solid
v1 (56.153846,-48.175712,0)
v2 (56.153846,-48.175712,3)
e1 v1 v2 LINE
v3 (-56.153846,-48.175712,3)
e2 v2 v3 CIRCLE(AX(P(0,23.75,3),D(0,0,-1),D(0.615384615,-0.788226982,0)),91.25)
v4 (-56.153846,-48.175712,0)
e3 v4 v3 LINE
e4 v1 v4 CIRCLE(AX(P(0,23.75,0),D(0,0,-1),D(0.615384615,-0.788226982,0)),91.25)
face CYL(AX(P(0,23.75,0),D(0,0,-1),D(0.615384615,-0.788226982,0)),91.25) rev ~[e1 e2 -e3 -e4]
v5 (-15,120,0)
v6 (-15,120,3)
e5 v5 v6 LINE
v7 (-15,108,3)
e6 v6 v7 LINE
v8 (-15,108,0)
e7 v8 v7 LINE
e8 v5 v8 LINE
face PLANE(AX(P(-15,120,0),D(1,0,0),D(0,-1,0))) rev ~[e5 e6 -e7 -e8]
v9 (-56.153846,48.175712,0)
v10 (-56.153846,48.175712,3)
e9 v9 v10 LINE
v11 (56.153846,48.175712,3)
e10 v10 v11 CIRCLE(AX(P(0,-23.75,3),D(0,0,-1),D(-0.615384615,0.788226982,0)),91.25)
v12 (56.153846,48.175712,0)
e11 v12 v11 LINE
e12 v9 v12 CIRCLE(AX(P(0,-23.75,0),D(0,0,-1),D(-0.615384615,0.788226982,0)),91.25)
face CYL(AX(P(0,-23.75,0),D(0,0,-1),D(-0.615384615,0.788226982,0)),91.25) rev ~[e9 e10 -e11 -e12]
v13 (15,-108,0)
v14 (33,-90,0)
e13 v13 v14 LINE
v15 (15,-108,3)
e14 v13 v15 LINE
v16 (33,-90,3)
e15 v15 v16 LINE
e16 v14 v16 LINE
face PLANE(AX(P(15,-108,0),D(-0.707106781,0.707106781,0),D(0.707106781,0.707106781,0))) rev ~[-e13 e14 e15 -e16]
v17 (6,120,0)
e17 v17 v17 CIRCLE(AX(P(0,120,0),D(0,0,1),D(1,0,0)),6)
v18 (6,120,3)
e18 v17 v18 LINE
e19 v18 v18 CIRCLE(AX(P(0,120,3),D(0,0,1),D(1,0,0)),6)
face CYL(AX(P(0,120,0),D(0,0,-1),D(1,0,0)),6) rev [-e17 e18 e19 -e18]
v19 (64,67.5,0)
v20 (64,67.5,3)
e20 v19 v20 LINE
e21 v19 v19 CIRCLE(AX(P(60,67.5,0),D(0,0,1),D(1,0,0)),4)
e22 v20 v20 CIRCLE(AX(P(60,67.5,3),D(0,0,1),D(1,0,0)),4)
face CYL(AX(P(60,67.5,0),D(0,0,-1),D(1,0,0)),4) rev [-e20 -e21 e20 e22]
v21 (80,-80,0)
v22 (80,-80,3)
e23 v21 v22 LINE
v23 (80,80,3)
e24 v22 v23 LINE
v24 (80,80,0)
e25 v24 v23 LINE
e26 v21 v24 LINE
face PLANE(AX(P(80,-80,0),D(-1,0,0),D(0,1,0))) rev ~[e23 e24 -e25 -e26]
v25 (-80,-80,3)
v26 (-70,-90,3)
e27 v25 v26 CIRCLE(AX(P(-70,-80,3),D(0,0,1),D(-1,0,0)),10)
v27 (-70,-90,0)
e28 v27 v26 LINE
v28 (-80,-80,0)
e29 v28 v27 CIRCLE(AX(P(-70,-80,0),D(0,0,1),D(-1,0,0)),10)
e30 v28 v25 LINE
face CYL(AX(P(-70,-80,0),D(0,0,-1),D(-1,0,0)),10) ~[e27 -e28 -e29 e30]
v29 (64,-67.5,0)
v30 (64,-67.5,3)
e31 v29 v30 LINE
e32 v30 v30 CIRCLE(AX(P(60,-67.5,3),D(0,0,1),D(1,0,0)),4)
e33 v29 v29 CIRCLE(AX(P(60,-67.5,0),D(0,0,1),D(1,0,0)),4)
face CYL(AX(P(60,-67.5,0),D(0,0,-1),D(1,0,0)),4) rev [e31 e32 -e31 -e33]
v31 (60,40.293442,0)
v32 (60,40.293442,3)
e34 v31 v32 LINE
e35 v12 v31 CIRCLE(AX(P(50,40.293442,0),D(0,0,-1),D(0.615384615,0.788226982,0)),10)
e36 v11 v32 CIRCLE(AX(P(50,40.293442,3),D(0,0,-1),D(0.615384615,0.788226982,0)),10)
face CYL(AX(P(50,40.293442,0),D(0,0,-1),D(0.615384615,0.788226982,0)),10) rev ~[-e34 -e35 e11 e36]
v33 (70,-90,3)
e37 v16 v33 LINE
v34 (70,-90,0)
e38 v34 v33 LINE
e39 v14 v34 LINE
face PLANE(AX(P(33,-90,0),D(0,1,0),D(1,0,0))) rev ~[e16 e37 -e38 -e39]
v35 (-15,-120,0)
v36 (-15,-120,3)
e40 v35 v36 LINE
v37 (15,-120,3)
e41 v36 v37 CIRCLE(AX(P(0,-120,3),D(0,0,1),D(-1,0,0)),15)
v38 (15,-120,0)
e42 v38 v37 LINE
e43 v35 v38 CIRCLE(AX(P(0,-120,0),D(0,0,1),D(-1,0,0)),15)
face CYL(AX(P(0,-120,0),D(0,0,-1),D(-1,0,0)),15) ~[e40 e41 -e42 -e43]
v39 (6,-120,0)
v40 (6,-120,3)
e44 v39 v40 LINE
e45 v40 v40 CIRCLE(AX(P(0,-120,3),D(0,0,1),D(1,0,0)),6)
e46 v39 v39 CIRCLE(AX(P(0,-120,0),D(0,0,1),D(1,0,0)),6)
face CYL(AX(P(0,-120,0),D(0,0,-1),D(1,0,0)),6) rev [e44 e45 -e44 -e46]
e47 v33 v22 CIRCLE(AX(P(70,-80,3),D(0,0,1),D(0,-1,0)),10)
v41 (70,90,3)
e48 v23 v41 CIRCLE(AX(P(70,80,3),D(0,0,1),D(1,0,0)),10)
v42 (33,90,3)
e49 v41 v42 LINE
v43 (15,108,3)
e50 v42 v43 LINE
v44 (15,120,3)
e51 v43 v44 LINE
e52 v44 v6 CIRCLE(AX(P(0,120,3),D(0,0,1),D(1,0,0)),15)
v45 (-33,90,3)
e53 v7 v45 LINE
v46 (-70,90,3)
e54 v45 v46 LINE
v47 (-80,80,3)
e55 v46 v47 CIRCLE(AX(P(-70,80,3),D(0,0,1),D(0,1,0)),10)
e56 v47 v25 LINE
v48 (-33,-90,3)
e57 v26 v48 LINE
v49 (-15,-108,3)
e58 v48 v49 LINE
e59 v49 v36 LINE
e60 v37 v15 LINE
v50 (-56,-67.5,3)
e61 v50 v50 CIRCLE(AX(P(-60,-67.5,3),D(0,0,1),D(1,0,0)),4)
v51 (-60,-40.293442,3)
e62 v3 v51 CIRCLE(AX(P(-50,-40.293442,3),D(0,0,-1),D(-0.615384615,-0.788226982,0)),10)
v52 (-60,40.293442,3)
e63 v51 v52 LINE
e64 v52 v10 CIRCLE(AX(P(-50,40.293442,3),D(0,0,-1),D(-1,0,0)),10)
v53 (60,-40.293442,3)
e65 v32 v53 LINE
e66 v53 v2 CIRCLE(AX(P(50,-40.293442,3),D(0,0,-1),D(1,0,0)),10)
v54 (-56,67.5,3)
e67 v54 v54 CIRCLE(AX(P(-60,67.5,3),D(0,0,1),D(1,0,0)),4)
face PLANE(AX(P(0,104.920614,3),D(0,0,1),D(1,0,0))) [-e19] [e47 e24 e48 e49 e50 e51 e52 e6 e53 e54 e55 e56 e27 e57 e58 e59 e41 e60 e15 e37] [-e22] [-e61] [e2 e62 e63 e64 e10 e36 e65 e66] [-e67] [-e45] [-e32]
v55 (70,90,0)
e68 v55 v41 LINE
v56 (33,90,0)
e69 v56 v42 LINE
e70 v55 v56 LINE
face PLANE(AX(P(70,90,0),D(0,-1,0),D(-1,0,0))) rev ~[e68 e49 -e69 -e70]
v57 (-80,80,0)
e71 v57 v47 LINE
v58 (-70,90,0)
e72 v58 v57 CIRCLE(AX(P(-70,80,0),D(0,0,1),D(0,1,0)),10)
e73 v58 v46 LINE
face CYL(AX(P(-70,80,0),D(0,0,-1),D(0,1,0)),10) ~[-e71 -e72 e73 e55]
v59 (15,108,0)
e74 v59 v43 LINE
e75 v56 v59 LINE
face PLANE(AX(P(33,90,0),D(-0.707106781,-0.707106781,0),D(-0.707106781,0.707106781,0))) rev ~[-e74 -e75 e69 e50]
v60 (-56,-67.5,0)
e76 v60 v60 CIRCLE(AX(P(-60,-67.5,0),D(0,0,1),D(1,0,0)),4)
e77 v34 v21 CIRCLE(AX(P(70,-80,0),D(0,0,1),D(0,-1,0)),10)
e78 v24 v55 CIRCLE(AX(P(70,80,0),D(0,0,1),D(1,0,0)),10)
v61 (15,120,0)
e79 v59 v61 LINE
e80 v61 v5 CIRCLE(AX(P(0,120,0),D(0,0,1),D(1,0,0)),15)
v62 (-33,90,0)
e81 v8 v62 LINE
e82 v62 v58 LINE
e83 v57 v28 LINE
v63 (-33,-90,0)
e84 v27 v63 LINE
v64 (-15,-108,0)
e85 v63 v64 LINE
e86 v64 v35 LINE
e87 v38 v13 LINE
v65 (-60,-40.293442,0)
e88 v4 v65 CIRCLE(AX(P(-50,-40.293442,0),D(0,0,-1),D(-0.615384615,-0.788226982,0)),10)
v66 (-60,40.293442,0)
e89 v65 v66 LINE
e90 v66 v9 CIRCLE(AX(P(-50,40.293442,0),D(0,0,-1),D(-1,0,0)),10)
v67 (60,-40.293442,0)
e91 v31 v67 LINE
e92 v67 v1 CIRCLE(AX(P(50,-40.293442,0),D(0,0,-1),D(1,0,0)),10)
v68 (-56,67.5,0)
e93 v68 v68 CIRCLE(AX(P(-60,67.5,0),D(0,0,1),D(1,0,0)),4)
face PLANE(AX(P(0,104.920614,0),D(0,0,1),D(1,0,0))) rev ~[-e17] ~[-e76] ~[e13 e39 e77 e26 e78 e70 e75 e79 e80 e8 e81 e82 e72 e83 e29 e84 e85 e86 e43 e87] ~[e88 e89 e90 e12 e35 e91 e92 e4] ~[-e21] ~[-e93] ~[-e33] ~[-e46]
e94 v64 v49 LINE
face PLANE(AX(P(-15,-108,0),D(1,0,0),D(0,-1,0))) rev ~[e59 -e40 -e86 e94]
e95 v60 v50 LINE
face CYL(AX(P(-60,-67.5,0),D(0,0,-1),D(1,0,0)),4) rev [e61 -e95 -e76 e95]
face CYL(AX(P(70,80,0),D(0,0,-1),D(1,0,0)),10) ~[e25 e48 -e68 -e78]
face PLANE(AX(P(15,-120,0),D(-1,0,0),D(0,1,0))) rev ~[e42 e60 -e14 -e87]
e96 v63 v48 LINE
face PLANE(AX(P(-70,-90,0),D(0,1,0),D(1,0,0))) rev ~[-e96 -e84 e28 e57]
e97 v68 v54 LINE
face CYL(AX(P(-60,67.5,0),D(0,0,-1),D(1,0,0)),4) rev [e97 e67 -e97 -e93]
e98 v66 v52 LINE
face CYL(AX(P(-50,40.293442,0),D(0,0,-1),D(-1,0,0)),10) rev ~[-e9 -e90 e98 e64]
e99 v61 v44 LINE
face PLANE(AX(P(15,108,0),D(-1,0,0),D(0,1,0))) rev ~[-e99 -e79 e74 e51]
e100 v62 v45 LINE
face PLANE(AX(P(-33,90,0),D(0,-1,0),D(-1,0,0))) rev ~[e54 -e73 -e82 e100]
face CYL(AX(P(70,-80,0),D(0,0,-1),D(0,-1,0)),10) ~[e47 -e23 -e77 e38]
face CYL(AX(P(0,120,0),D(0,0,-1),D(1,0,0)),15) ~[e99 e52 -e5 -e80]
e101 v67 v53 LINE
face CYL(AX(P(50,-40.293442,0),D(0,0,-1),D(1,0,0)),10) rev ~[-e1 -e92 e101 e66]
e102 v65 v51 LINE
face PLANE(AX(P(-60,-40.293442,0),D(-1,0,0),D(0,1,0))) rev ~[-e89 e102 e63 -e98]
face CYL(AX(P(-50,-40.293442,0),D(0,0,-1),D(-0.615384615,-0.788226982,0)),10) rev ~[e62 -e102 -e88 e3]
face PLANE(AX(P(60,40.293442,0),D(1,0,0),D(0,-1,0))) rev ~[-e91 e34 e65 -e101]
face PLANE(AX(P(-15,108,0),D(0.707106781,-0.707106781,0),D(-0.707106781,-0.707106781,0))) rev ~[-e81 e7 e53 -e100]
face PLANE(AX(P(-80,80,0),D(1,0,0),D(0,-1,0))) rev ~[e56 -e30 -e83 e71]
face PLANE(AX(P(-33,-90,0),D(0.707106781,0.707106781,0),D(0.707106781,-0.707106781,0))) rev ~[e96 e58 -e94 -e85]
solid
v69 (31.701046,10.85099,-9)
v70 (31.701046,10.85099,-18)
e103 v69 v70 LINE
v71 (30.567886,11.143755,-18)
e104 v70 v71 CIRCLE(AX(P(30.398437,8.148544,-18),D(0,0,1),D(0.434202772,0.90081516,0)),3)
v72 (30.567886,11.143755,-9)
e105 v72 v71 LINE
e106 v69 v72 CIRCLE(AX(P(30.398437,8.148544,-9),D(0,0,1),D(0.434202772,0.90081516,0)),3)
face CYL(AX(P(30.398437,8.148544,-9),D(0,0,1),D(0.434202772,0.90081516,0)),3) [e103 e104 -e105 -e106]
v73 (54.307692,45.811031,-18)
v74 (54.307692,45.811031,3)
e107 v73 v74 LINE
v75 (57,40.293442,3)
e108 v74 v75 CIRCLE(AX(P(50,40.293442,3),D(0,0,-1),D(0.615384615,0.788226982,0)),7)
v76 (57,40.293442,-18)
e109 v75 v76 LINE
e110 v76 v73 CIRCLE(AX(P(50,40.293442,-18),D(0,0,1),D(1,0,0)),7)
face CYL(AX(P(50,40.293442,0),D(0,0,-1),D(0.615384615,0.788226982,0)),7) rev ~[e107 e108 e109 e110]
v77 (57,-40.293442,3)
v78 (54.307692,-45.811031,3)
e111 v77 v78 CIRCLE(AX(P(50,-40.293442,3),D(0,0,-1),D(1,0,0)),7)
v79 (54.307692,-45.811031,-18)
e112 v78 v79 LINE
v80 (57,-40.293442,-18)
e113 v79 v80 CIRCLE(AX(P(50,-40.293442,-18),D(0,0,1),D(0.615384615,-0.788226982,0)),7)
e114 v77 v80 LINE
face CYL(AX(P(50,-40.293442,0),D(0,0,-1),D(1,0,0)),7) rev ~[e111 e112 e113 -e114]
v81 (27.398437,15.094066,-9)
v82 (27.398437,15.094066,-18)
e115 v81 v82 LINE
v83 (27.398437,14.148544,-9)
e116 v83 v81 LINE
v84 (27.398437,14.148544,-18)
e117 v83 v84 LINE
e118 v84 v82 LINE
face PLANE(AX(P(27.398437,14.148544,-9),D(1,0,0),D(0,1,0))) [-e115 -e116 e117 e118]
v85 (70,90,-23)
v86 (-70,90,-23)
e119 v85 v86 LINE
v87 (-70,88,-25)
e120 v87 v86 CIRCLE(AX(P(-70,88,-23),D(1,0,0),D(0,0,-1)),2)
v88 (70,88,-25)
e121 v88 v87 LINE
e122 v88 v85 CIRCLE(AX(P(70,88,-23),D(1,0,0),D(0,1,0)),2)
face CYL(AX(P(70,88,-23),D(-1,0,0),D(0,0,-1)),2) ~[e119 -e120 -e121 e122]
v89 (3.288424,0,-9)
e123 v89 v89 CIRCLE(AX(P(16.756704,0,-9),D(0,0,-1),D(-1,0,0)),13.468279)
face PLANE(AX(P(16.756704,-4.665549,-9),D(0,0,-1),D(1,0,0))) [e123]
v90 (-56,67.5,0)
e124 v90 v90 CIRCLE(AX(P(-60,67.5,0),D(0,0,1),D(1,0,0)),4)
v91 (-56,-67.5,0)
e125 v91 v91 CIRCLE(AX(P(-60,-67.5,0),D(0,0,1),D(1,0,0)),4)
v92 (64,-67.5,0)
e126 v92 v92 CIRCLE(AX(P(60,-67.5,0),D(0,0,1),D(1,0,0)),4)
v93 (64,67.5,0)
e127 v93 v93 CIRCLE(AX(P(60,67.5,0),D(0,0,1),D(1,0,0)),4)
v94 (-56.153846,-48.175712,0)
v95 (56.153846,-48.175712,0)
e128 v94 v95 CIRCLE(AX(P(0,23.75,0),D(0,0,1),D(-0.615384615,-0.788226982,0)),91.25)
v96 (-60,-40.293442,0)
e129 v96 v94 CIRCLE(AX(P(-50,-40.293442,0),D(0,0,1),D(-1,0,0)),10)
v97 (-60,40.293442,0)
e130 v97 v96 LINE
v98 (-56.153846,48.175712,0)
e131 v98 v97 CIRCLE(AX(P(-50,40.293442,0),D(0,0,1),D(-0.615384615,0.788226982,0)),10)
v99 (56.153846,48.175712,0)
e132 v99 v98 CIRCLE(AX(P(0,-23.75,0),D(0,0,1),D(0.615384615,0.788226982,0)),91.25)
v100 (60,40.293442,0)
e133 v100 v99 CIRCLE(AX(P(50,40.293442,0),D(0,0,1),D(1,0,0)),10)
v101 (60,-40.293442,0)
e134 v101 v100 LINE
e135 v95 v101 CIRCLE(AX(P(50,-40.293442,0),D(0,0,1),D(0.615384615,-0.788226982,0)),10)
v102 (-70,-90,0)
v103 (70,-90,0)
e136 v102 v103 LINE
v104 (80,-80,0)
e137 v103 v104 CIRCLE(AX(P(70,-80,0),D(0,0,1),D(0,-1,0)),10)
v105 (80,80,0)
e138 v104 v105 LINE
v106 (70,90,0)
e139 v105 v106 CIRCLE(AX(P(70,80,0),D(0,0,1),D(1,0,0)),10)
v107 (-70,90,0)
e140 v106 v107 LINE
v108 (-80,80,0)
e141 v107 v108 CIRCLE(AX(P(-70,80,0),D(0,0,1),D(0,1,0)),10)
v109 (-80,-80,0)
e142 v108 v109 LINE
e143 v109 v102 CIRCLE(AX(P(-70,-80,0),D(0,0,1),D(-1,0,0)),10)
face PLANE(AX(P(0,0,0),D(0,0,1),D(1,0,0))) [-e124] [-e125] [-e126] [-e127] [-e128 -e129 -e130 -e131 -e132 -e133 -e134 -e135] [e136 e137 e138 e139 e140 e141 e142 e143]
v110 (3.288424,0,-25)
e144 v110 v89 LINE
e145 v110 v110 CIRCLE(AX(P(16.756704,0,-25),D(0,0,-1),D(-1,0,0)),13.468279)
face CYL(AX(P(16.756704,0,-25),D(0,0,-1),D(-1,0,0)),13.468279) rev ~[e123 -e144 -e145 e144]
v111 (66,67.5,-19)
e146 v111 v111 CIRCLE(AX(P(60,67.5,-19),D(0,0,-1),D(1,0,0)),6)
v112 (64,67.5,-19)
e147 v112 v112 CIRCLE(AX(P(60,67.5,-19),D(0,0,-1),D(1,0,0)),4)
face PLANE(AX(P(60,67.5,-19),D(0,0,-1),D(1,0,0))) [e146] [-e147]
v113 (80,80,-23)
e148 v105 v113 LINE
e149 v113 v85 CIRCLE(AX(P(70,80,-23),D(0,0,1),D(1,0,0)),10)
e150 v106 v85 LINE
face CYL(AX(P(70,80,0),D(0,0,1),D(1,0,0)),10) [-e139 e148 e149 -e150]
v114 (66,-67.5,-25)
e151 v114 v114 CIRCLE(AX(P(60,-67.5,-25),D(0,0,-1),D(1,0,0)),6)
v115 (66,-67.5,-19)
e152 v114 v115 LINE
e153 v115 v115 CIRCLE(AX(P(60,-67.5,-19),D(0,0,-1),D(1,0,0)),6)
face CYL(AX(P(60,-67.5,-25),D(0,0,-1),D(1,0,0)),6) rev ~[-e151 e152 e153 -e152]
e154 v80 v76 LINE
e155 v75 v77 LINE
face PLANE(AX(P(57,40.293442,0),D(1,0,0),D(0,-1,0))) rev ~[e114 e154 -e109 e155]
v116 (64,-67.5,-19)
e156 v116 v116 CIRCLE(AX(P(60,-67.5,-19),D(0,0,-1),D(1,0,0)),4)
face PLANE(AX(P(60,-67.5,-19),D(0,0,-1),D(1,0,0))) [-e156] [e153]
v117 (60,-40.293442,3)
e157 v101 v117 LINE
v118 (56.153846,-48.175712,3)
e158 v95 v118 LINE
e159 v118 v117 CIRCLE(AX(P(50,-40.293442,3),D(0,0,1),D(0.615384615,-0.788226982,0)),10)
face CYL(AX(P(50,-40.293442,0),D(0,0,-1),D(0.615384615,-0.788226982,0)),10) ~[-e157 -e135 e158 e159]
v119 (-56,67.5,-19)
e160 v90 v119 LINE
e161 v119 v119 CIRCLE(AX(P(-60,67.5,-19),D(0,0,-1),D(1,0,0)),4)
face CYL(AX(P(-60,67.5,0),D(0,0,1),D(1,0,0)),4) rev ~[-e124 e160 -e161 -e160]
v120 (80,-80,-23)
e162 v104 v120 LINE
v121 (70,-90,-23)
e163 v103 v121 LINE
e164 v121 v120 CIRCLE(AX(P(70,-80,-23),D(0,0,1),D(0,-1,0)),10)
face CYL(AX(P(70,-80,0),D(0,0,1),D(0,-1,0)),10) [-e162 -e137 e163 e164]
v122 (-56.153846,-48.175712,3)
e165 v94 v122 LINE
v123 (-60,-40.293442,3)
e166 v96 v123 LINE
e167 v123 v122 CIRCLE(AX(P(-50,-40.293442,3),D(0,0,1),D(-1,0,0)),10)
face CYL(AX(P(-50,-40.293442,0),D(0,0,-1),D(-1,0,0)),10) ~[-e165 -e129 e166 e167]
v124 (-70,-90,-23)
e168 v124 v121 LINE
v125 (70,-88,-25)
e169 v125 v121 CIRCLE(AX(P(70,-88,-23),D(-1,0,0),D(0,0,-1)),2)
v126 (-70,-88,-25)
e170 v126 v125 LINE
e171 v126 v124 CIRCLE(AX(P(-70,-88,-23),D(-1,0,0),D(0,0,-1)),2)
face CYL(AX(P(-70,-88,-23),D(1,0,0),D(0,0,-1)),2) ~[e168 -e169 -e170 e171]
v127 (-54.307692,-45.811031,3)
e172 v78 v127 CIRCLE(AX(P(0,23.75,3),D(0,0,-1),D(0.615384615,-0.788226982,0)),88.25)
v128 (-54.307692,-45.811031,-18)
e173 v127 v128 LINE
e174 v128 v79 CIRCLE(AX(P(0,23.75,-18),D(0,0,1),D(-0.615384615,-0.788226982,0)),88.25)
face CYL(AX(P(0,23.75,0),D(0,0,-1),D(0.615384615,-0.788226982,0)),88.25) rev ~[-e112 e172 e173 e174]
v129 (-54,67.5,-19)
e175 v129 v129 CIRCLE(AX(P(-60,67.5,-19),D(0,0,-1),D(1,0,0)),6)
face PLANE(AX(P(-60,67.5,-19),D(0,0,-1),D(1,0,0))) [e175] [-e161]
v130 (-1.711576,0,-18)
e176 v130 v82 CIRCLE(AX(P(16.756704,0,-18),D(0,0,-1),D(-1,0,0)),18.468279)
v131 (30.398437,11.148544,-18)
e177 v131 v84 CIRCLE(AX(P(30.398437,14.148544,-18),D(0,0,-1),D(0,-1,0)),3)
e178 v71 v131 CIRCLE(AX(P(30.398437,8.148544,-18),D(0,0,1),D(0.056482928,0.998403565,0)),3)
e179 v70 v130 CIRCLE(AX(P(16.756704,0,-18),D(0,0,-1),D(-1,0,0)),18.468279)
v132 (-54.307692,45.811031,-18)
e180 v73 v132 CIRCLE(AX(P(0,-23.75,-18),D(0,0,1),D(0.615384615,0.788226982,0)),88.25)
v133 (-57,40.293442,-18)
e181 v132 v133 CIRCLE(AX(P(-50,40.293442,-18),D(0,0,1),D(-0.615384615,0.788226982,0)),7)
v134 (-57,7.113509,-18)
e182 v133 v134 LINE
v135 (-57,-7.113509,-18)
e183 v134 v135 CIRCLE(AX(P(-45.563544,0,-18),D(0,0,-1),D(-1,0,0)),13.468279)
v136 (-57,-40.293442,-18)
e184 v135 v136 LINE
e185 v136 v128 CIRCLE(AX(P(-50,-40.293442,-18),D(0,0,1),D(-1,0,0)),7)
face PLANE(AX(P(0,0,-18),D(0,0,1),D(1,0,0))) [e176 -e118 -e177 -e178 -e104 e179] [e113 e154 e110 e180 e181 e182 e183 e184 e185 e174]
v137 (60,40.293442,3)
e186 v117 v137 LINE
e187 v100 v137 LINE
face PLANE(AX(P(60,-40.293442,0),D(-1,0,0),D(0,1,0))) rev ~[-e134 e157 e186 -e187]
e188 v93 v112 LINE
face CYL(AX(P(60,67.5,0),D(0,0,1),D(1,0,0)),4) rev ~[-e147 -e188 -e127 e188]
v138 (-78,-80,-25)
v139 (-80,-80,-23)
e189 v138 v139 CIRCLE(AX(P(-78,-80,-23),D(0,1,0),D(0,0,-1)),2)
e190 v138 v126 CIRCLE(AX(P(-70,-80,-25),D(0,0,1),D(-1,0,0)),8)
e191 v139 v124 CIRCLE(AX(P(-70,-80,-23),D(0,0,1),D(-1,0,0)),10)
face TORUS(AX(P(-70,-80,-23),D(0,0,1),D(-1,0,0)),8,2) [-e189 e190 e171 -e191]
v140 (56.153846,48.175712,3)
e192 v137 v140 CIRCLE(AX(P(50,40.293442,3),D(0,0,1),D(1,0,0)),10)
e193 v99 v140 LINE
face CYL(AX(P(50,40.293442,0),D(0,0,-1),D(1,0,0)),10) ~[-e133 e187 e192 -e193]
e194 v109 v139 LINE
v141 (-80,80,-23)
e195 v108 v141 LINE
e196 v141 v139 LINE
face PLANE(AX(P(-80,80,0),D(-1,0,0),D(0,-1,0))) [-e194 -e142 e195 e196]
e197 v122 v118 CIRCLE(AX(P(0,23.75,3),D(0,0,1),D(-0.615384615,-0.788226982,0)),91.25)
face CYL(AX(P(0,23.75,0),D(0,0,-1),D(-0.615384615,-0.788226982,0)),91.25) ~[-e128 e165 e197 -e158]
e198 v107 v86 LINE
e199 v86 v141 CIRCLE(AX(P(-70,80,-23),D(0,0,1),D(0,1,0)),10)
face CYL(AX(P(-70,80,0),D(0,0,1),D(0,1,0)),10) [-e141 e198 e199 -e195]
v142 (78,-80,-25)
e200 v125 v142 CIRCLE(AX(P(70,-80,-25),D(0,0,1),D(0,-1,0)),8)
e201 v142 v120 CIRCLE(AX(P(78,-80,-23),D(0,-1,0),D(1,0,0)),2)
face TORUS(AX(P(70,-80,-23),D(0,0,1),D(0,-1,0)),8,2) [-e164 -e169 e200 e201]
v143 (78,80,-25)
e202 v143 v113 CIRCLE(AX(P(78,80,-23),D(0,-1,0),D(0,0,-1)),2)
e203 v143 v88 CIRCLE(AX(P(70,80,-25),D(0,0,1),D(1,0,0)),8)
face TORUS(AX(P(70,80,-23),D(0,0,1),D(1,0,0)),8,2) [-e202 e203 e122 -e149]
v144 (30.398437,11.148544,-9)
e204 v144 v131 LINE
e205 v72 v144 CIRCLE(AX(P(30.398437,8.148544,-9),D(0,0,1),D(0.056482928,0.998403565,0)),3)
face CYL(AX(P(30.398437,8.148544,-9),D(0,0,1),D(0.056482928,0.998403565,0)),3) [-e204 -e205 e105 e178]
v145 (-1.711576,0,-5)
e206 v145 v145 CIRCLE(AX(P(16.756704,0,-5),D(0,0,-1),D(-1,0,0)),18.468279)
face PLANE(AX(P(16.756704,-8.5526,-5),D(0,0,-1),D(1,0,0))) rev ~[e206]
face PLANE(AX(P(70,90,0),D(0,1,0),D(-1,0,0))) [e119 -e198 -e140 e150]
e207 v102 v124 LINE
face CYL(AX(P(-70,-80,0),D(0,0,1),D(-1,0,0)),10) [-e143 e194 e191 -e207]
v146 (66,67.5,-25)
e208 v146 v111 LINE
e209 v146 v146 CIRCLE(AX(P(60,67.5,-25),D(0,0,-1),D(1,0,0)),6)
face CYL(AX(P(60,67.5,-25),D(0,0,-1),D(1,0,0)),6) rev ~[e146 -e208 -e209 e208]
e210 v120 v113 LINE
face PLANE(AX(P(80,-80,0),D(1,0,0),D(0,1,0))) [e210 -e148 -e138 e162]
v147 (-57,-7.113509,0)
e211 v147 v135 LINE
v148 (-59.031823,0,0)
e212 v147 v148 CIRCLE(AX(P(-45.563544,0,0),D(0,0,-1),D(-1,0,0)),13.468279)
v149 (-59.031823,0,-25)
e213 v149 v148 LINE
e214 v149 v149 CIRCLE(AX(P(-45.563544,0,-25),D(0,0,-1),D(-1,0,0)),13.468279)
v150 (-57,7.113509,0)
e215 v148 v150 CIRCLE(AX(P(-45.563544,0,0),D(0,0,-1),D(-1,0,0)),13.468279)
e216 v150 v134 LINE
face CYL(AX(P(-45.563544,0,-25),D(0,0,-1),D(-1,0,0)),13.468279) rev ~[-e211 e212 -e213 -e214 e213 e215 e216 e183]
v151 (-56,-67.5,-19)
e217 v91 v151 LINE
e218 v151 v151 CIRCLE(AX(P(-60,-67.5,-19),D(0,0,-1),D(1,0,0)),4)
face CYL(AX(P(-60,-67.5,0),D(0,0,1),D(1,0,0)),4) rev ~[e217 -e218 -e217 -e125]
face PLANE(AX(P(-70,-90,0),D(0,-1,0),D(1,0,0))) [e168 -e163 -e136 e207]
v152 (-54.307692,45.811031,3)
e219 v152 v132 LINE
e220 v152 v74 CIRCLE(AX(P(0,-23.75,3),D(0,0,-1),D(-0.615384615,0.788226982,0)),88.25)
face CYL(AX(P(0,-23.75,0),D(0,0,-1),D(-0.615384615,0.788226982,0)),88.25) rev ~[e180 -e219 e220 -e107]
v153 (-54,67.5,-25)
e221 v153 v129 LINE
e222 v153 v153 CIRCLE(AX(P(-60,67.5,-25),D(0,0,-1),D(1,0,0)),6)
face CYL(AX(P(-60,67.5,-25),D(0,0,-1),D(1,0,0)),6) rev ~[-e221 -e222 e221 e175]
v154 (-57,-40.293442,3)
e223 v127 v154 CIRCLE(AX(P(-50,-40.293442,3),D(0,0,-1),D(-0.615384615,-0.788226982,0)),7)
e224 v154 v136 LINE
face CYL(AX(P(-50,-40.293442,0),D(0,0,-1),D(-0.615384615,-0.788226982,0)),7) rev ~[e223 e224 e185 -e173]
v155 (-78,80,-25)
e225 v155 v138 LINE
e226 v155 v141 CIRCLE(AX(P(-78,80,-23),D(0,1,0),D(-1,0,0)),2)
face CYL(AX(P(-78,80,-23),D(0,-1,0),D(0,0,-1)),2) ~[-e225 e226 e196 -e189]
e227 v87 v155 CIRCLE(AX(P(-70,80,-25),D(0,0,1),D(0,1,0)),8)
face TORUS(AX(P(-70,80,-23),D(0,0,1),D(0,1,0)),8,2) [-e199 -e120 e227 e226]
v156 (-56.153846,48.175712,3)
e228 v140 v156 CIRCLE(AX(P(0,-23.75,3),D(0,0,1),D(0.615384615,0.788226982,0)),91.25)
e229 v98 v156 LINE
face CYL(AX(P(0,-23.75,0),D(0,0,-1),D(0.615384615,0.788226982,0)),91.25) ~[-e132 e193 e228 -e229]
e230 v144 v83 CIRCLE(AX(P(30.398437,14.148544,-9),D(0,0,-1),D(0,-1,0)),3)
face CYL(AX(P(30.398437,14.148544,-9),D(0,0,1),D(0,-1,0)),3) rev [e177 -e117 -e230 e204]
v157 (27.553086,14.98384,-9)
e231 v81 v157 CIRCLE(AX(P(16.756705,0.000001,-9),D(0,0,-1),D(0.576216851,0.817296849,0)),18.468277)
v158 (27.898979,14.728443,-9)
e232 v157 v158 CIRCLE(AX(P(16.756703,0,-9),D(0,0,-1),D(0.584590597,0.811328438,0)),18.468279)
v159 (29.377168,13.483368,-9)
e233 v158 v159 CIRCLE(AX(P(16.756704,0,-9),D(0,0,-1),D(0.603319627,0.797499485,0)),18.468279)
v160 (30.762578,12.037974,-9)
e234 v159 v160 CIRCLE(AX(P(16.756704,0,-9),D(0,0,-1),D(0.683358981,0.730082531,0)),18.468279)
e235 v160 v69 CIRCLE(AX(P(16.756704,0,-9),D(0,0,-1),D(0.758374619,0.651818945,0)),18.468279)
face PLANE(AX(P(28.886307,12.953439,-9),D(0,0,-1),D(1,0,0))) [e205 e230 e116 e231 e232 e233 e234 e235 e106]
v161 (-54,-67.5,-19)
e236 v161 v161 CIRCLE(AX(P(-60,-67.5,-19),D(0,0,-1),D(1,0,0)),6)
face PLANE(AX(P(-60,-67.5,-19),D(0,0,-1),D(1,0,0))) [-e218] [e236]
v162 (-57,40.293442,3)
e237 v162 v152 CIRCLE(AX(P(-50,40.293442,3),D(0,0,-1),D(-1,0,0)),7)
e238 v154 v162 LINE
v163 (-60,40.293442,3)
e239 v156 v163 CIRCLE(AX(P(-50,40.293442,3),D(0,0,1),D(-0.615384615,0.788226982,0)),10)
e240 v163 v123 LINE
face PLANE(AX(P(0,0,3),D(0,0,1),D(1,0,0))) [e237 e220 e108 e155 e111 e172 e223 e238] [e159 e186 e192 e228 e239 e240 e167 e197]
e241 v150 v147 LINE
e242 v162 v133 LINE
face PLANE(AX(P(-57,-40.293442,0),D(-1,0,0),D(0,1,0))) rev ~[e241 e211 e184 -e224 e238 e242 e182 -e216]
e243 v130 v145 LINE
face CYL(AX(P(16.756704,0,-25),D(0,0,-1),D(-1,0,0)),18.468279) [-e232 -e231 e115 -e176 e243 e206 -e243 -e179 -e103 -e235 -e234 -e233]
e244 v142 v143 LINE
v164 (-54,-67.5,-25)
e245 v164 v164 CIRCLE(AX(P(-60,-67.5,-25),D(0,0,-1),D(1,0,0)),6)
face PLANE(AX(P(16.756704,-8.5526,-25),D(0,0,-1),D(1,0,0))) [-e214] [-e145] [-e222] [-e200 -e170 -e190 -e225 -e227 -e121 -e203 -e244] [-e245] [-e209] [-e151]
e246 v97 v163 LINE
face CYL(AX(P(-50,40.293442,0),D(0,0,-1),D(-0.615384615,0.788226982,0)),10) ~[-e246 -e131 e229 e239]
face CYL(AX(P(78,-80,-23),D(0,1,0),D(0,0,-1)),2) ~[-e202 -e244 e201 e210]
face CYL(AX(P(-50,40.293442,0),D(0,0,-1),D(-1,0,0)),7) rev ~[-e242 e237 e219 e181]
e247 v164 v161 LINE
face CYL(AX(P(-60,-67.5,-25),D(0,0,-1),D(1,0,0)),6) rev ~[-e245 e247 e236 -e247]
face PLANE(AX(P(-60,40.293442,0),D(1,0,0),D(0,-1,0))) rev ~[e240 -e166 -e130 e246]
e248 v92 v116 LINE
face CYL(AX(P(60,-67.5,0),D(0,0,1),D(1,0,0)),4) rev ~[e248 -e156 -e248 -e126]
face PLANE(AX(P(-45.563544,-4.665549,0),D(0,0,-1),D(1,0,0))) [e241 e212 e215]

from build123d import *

# Parameters (mm, degrees)
F0_R      = 4
F1_DEPTH  = 25
F2_DEPTH  = 3
F3_DEPTH  = 18
F5_DEPTH  = 2
F7_DEPTH  = 20
F8_DEPTH  = 16
F9_DEPTH  = 25
F6_R      = 6
F6_R_2    = 4
F10_DEPTH = 6
F12_DEPTH = 9
F14_R     = 2
F15_R     = 6
F15_R_2   = 4
F16_DEPTH = 3


# Not quite as in the source:
# - a feature of the source that left no trace in its solid (it failed there, or was rolled back) is left out


with BuildPart() as f1:
    # F0 (on Top) → F1 (new body)
    with BuildSketch(Plane.XY):
        with BuildLine():
            ThreePointArc((-80, -80), (-77.0710678119, -87.0710678119), (-70, -90))
            Line((-70, -90), (70, -90))
            ThreePointArc((70, -90), (77.0710678119, -87.0710678119), (80, -80))
            Line((80, -80), (80, 80))
            ThreePointArc((80, 80), (77.0710678119, 87.0710678119), (70, 90))
            Line((70, 90), (-70, 90))
            ThreePointArc((-70, 90), (-77.0710678119, 87.0710678119), (-80, 80))
            Line((-80, 80), (-80, -80))
        make_face()
        with Locations((-60, -67.5)):
            Circle(F0_R, mode=Mode.SUBTRACT)
        with Locations((60, -67.5)):
            Circle(F0_R, mode=Mode.SUBTRACT)
        with Locations((-60, 67.5)):
            Circle(F0_R, mode=Mode.SUBTRACT)
        with BuildLine():
            ThreePointArc((-64, 40.2934422872), (-62.5820384798, 46.4328484224), (-58.6153846154, 51.3286200352))
            ThreePointArc((-58.6153846154, 51.3286200352), (0, 71.5), (58.6153846154, 51.3286200352))
            ThreePointArc((58.6153846154, 51.3286200352), (62.5820384798, 46.4328484224), (64, 40.2934422872))
            Line((64, 40.2934422872), (64, -40.2934422872))
            ThreePointArc((64, -40.2934422872), (62.5820384798, -46.4328484224), (58.6153846154, -51.3286200352))
            ThreePointArc((58.6153846154, -51.3286200352), (0, -71.5), (-58.6153846154, -51.3286200352))
            ThreePointArc((-58.6153846154, -51.3286200352), (-62.5820384798, -46.4328484224), (-64, -40.2934422872))
            Line((-64, -40.2934422872), (-64, 40.2934422872))
        make_face(mode=Mode.SUBTRACT)
        with Locations((60, 67.5)):
            Circle(F0_R, mode=Mode.SUBTRACT)
        with BuildLine():
            ThreePointArc((58.6153846154, 51.3286200352), (0, 71.5), (-58.6153846154, 51.3286200352))
            ThreePointArc((-58.6153846154, 51.3286200352), (-62.5820384798, 46.4328484224), (-64, 40.2934422872))
            Line((-64, 40.2934422872), (-64, -40.2934422872))
            ThreePointArc((-64, -40.2934422872), (-62.5820384798, -46.4328484224), (-58.6153846154, -51.3286200352))
            ThreePointArc((-58.6153846154, -51.3286200352), (0, -71.5), (58.6153846154, -51.3286200352))
            ThreePointArc((58.6153846154, -51.3286200352), (62.5820384798, -46.4328484224), (64, -40.2934422872))
            Line((64, -40.2934422872), (64, 40.2934422872))
            ThreePointArc((64, 40.2934422872), (62.5820384798, 46.4328484224), (58.6153846154, 51.3286200352))
        make_face()
        with BuildLine():
            Line((-60, -40.2934422872), (-60, 40.2934422872))
            ThreePointArc((-60, 40.2934422872), (-58.9871703427, 44.6787323838), (-56.1538461538, 48.1757121072))
            ThreePointArc((-56.1538461538, 48.1757121072), (0, 67.5), (56.1538461538, 48.1757121072))
            ThreePointArc((56.1538461538, 48.1757121072), (58.9871703427, 44.6787323838), (60, 40.2934422872))
            Line((60, 40.2934422872), (60, -40.2934422872))
            ThreePointArc((60, -40.2934422872), (58.9871703427, -44.6787323838), (56.1538461538, -48.1757121072))
            ThreePointArc((56.1538461538, -48.1757121072), (0, -67.5), (-56.1538461538, -48.1757121072))
            ThreePointArc((-56.1538461538, -48.1757121072), (-58.9871703427, -44.6787323838), (-60, -40.2934422872))
        make_face(mode=Mode.SUBTRACT)
        with BuildLine():
            ThreePointArc((-56.1538461538, 48.1757121072), (-58.9871703427, 44.6787323838), (-60, 40.2934422872))
            Line((-60, 40.2934422872), (-60, -40.2934422872))
            ThreePointArc((-60, -40.2934422872), (-58.9871703427, -44.6787323838), (-56.1538461538, -48.1757121072))
            ThreePointArc((-56.1538461538, -48.1757121072), (0, -67.5), (56.1538461538, -48.1757121072))
            ThreePointArc((56.1538461538, -48.1757121072), (58.9871703427, -44.6787323838), (60, -40.2934422872))
            Line((60, -40.2934422872), (60, 40.2934422872))
            ThreePointArc((60, 40.2934422872), (58.9871703427, 44.6787323838), (56.1538461538, 48.1757121072))
            ThreePointArc((56.1538461538, 48.1757121072), (0, 67.5), (-56.1538461538, 48.1757121072))
        make_face()
        with BuildLine():
            ThreePointArc((54.3076923077, 45.8110311612), (56.2910192399, 43.3631453548), (57, 40.2934422872))
            Line((57, 40.2934422872), (57, -40.2934422872))
            ThreePointArc((57, -40.2934422872), (56.2910192399, -43.3631453548), (54.3076923077, -45.8110311612))
            ThreePointArc((54.3076923077, -45.8110311612), (0, -64.5), (-54.3076923077, -45.8110311612))
            ThreePointArc((-54.3076923077, -45.8110311612), (-56.2910192399, -43.3631453548), (-57, -40.2934422872))
            Line((-57, -40.2934422872), (-57, 40.2934422872))
            ThreePointArc((-57, 40.2934422872), (-56.2910192399, 43.3631453548), (-54.3076923077, 45.8110311612))
            ThreePointArc((-54.3076923077, 45.8110311612), (0, 64.5), (54.3076923077, 45.8110311612))
        make_face(mode=Mode.SUBTRACT)
        with BuildLine():
            Line((57, -40.2934422872), (57, 40.2934422872))
            ThreePointArc((57, 40.2934422872), (56.2910192399, 43.3631453548), (54.3076923077, 45.8110311612))
            ThreePointArc((54.3076923077, 45.8110311612), (0, 64.5), (-54.3076923077, 45.8110311612))
            ThreePointArc((-54.3076923077, 45.8110311612), (-56.2910192399, 43.3631453548), (-57, 40.2934422872))
            Line((-57, 40.2934422872), (-57, -40.2934422872))
            ThreePointArc((-57, -40.2934422872), (-56.2910192399, -43.3631453548), (-54.3076923077, -45.8110311612))
            ThreePointArc((-54.3076923077, -45.8110311612), (0, -64.5), (54.3076923077, -45.8110311612))
            ThreePointArc((54.3076923077, -45.8110311612), (56.2910192399, -43.3631453548), (57, -40.2934422872))
        make_face()
    extrude(amount=-F1_DEPTH)

    # F0 (on Top) → F2 (join)
    with BuildSketch(Plane.XY):
        with BuildLine():
            ThreePointArc((-56.1538461538, 48.1757121072), (-58.9871703427, 44.6787323838), (-60, 40.2934422872))
            Line((-60, 40.2934422872), (-60, -40.2934422872))
            ThreePointArc((-60, -40.2934422872), (-58.9871703427, -44.6787323838), (-56.1538461538, -48.1757121072))
            ThreePointArc((-56.1538461538, -48.1757121072), (0, -67.5), (56.1538461538, -48.1757121072))
            ThreePointArc((56.1538461538, -48.1757121072), (58.9871703427, -44.6787323838), (60, -40.2934422872))
            Line((60, -40.2934422872), (60, 40.2934422872))
            ThreePointArc((60, 40.2934422872), (58.9871703427, 44.6787323838), (56.1538461538, 48.1757121072))
            ThreePointArc((56.1538461538, 48.1757121072), (0, 67.5), (-56.1538461538, 48.1757121072))
        make_face()
        with BuildLine():
            ThreePointArc((54.3076923077, 45.8110311612), (56.2910192399, 43.3631453548), (57, 40.2934422872))
            Line((57, 40.2934422872), (57, -40.2934422872))
            ThreePointArc((57, -40.2934422872), (56.2910192399, -43.3631453548), (54.3076923077, -45.8110311612))
            ThreePointArc((54.3076923077, -45.8110311612), (0, -64.5), (-54.3076923077, -45.8110311612))
            ThreePointArc((-54.3076923077, -45.8110311612), (-56.2910192399, -43.3631453548), (-57, -40.2934422872))
            Line((-57, -40.2934422872), (-57, 40.2934422872))
            ThreePointArc((-57, 40.2934422872), (-56.2910192399, 43.3631453548), (-54.3076923077, 45.8110311612))
            ThreePointArc((-54.3076923077, 45.8110311612), (0, 64.5), (54.3076923077, 45.8110311612))
        make_face(mode=Mode.SUBTRACT)
    extrude(amount=F2_DEPTH)

    # F0 (on Top) → F3 (cut)
    with BuildSketch(Plane.XY):
        with BuildLine():
            Line((57, -40.2934422872), (57, 40.2934422872))
            ThreePointArc((57, 40.2934422872), (56.2910192399, 43.3631453548), (54.3076923077, 45.8110311612))
            ThreePointArc((54.3076923077, 45.8110311612), (0, 64.5), (-54.3076923077, 45.8110311612))
            ThreePointArc((-54.3076923077, 45.8110311612), (-56.2910192399, 43.3631453548), (-57, 40.2934422872))
            Line((-57, 40.2934422872), (-57, -40.2934422872))
            ThreePointArc((-57, -40.2934422872), (-56.2910192399, -43.3631453548), (-54.3076923077, -45.8110311612))
            ThreePointArc((-54.3076923077, -45.8110311612), (0, -64.5), (54.3076923077, -45.8110311612))
            ThreePointArc((54.3076923077, -45.8110311612), (56.2910192399, -43.3631453548), (57, -40.2934422872))
        make_face()
    extrude(amount=-F3_DEPTH, mode=Mode.SUBTRACT)

    # F4 (on face) → F5 (cut)
    with BuildSketch(Plane.XY.offset(3)):
        with BuildLine():
            Line((23, -39.2465276821), (23, 39.2465276821))
            ThreePointArc((23, 39.2465276821), (21.7633659499, 42.89486221), (18.5632183908, 45.0393118368))
            ThreePointArc((18.5632183908, 45.0393118368), (0, 47.5), (-18.5632183908, 45.0393118368))
            ThreePointArc((-18.5632183908, 45.0393118368), (-21.7633659499, 42.89486221), (-23, 39.2465276821))
            Line((-23, 39.2465276821), (-23, -39.2465276821))
            ThreePointArc((-23, -39.2465276821), (-21.7633659499, -42.89486221), (-18.5632183908, -45.0393118368))
            ThreePointArc((-18.5632183908, -45.0393118368), (0, -47.5), (18.5632183908, -45.0393118368))
            ThreePointArc((18.5632183908, -45.0393118368), (21.7633659499, -42.89486221), (23, -39.2465276821))
        make_face()
        with BuildLine():
            ThreePointArc((18.0421455939, 43.1083837852), (20.1755772999, 41.6787507007), (21, 39.2465276821))
            Line((21, 39.2465276821), (21, -39.2465276821))
            ThreePointArc((21, -39.2465276821), (20.1755772999, -41.6787507007), (18.0421455939, -43.1083837852))
            ThreePointArc((18.0421455939, -43.1083837852), (0, -45.5), (-18.0421455939, -43.1083837852))
            ThreePointArc((-18.0421455939, -43.1083837852), (-20.1755772999, -41.6787507007), (-21, -39.2465276821))
            Line((-21, -39.2465276821), (-21, 39.2465276821))
            ThreePointArc((-21, 39.2465276821), (-20.1755772999, 41.6787507007), (-18.0421455939, 43.1083837852))
            ThreePointArc((-18.0421455939, 43.1083837852), (0, 45.5), (18.0421455939, 43.1083837852))
        make_face(mode=Mode.SUBTRACT)
    extrude(amount=-F5_DEPTH, mode=Mode.SUBTRACT)

    # F6 (on face) → F7 (join)
    with BuildSketch(Plane(origin=(0, 0, -25), x_dir=(1, 0, 0), z_dir=(0, 0, -1))):
        with BuildLine():
            ThreePointArc((3.28842436, 0), (16.7567035675, 13.4682792075), (30.224982775, 0))
            Line((30.224982775, 0), (35.224982775, 0))
            ThreePointArc((35.224982775, 0), (16.7567035675, 18.4682792075), (-1.71157564, 0))
            Line((-1.71157564, 0), (3.28842436, 0))
        make_face()
        with BuildLine():
            Line((3.28842436, 0), (30.224982775, 0))
            ThreePointArc((30.224982775, 0), (16.7567035675, 13.4682792075), (3.28842436, 0))
        make_face()
        with BuildLine():
            ThreePointArc((3.28842436, 0), (16.7567035675, -13.4682792075), (30.224982775, 0))
            Line((30.224982775, 0), (3.28842436, 0))
        make_face()
        with BuildLine():
            Line((35.224982775, 0), (30.224982775, 0))
            ThreePointArc((30.224982775, 0), (16.7567035675, -13.4682792075), (3.28842436, 0))
            Line((3.28842436, 0), (-1.71157564, 0))
            ThreePointArc((-1.71157564, 0), (16.7567035675, -18.4682792075), (35.224982775, 0))
        make_face()
    extrude(amount=-F7_DEPTH)

    # F6 (on face) → F8 (cut)
    with BuildSketch(Plane(origin=(0, 0, -25), x_dir=(1, 0, 0), z_dir=(0, 0, -1))):
        with BuildLine():
            Line((3.28842436, 0), (30.224982775, 0))
            ThreePointArc((30.224982775, 0), (16.7567035675, 13.4682792075), (3.28842436, 0))
        make_face()
        with BuildLine():
            ThreePointArc((3.28842436, 0), (16.7567035675, -13.4682792075), (30.224982775, 0))
            Line((30.224982775, 0), (3.28842436, 0))
        make_face()
    extrude(amount=-F8_DEPTH, mode=Mode.SUBTRACT)

    # F6 (on face) → F9 (cut)
    with BuildSketch(Plane(origin=(0, 0, -25), x_dir=(1, 0, 0), z_dir=(0, 0, -1))):
        with BuildLine():
            Line((-59.0318229325, 0), (-32.0952645175, 0))
            ThreePointArc((-32.0952645175, 0), (-45.563543725, 13.4682792075), (-59.0318229325, 0))
        make_face()
        with BuildLine():
            ThreePointArc((-59.0318229325, 0), (-45.563543725, -13.4682792075), (-32.0952645175, 0))
            Line((-32.0952645175, 0), (-59.0318229325, 0))
        make_face()
    extrude(amount=-F9_DEPTH, mode=Mode.SUBTRACT)

    # F6 (on face) → F10 (cut)
    with BuildSketch(Plane(origin=(0, 0, -25), x_dir=(1, 0, 0), z_dir=(0, 0, -1))):
        with Locations((60, -67.5)):
            Circle(F6_R)
        with Locations((60, -67.5)):
            Circle(F6_R_2, mode=Mode.SUBTRACT)
        with Locations((-60, -67.5)):
            Circle(F6_R)
        with Locations((-60, -67.5)):
            Circle(F6_R_2, mode=Mode.SUBTRACT)
        with Locations((-60, 67.5)):
            Circle(F6_R)
        with Locations((-60, 67.5)):
            Circle(F6_R_2, mode=Mode.SUBTRACT)
        with Locations((60, 67.5)):
            Circle(F6_R)
        with Locations((60, 67.5)):
            Circle(F6_R_2, mode=Mode.SUBTRACT)
    extrude(amount=-F10_DEPTH, mode=Mode.SUBTRACT)

    # F11 (on face) → F12 (cut, through all)
    with BuildSketch(Plane(origin=(0, 0, -9), x_dir=(1, 0, 0), z_dir=(0, 0, -1))):
        with BuildLine():
            Line((27.3984372721, -14.1485442653), (27.3984372721, -15.0940664053))
            ThreePointArc((27.3984372721, -15.0940664053), (27.475903284, -15.0391520481), (27.5530859277, -14.9838401226))
            ThreePointArc((27.5530859277, -14.9838401226), (27.7267756743, -14.8571482748), (27.8989788804, -14.728443154))
            ThreePointArc((27.8989788804, -14.728443154), (28.6543715524, -14.1252551626), (29.3771680347, -13.4833680332))
            ThreePointArc((29.3771680347, -13.4833680332), (30.0894740452, -12.7794588413), (30.7625777768, -12.0379742698))
            ThreePointArc((30.7625777768, -12.0379742698), (30.6440414845, -11.5954782507), (30.5678860614, -11.1437549604))
            ThreePointArc((30.5678860614, -11.1437549604), (30.4831955013, -11.1473467), (30.3984372721, -11.1485442653))
            ThreePointArc((30.3984372721, -11.1485442653), (28.2771169286, -12.0272239217), (27.3984372721, -14.1485442653))
        make_face()
        with BuildLine():
            ThreePointArc((37.6905631259, -6.728443154), (39.1958060597, -10.7902926705), (37.3915476096, -14.728443154))
            Line((37.3915476096, -14.728443154), (37.6905631259, -14.728443154))
            ThreePointArc((37.6905631259, -14.728443154), (39.8118834694, -13.8497634975), (40.6905631259, -11.728443154))
            Line((40.6905631259, -11.728443154), (40.6905631259, -9.728443154))
            ThreePointArc((40.6905631259, -9.728443154), (39.8118834694, -7.6071228104), (37.6905631259, -6.728443154))
        make_face()
        with BuildLine():
            ThreePointArc((30.7625777768, -12.0379742698), (31.2439734276, -11.4540974715), (31.7010455878, -10.8509897459))
            ThreePointArc((31.7010455878, -10.8509897459), (31.1488810727, -11.05316715), (30.5678860614, -11.1437549604))
            ThreePointArc((30.5678860614, -11.1437549604), (30.6440414845, -11.5954782507), (30.7625777768, -12.0379742698))
        make_face()
        with BuildLine():
            ThreePointArc((32.9048821405, -14.728443154), (33.1479898385, -14.8632336648), (33.3984372721, -14.9838401226))
            Line((33.3984372721, -14.9838401226), (37.097122848, -14.9838401226))
            ThreePointArc((37.097122848, -14.9838401226), (37.2465319962, -14.8586740986), (37.3915476096, -14.728443154))
            Line((37.3915476096, -14.728443154), (32.9048821405, -14.728443154))
        make_face()
        with BuildLine():
            Line((37.097122848, -14.9838401226), (33.3984372721, -14.9838401226))
            ThreePointArc((33.3984372721, -14.9838401226), (35.1063741518, -15.3971839704), (36.8492913953, -15.1732621))
            ThreePointArc((36.8492913953, -15.1732621), (36.9745109281, -15.0802569548), (37.097122848, -14.9838401226))
        make_face()
        with BuildLine():
            ThreePointArc((37.097122848, -14.9838401226), (36.9745109281, -15.0802569548), (36.8492913953, -15.1732621))
            ThreePointArc((36.8492913953, -15.1732621), (37.0995782353, -15.0853439985), (37.3446701732, -14.9838401226))
            Line((37.3446701732, -14.9838401226), (37.097122848, -14.9838401226))
        make_face()
    extrude(amount=F12_DEPTH, mode=Mode.SUBTRACT)

    # F14
    f14_edges = [f1.edges().sort_by_distance(p)[0] for p in [
        (0, -90, -25),
        (-77.071068, -87.071068, -25),
        (-80, 0, -25),
        (-77.071068, 87.071068, -25),
        (77.071068, -87.071068, -25),
        (0, 90, -25),
        (80, 0, -25),
        (77.071068, 87.071068, -25),
    ]]
    fillet(f14_edges, radius=F14_R)


with BuildPart() as f16:
    # F15 (on face) → F16 (new body, through all)
    with BuildSketch(Plane.XY):
        with BuildLine():
            Line((-15, 108), (-33, 90))
            Line((-33, 90), (33, 90))
            Line((33, 90), (15, 108))
            Line((15, 108), (15, 120))
            ThreePointArc((15, 120), (0, 135), (-15, 120))
            Line((-15, 120), (-15, 108))
        make_face()
        with Locations((0, 120)):
            Circle(F15_R, mode=Mode.SUBTRACT)
        with BuildLine():
            Line((33, -90), (-33, -90))
            Line((-33, -90), (-15, -108))
            Line((-15, -108), (-15, -120))
            ThreePointArc((-15, -120), (0, -135), (15, -120))
            Line((15, -120), (15, -108))
            Line((15, -108), (33, -90))
        make_face()
        with Locations((0, -120)):
            Circle(F15_R, mode=Mode.SUBTRACT)
        with BuildLine():
            Line((-33, 90), (-70, 90))
            ThreePointArc((-70, 90), (-77.0710678119, 87.0710678119), (-80, 80))
            Line((-80, 80), (-80, -80))
            ThreePointArc((-80, -80), (-77.0710678119, -87.0710678119), (-70, -90))
            Line((-70, -90), (-33, -90))
            Line((-33, -90), (33, -90))
            Line((33, -90), (70, -90))
            ThreePointArc((70, -90), (77.0710678119, -87.0710678119), (80, -80))
            Line((80, -80), (80, 80))
            ThreePointArc((80, 80), (77.0710678119, 87.0710678119), (70, 90))
            Line((70, 90), (33, 90))
            Line((33, 90), (-33, 90))
        make_face()
        with Locations((-60, -67.5)):
            Circle(F15_R_2, mode=Mode.SUBTRACT)
        with Locations((60, -67.5)):
            Circle(F15_R_2, mode=Mode.SUBTRACT)
        with Locations((-60, 67.5)):
            Circle(F15_R_2, mode=Mode.SUBTRACT)
        with BuildLine():
            ThreePointArc((-56.1538461538, 48.1757121072), (0, 67.5), (56.1538461538, 48.1757121072))
            ThreePointArc((56.1538461538, 48.1757121072), (58.9871703427, 44.6787323838), (60, 40.2934422872))
            Line((60, 40.2934422872), (60, -40.2934422872))
            ThreePointArc((60, -40.2934422872), (58.9871703427, -44.6787323838), (56.1538461538, -48.1757121072))
            ThreePointArc((56.1538461538, -48.1757121072), (0, -67.5), (-56.1538461538, -48.1757121072))
            ThreePointArc((-56.1538461538, -48.1757121072), (-58.9871703427, -44.6787323838), (-60, -40.2934422872))
            Line((-60, -40.2934422872), (-60, 40.2934422872))
            ThreePointArc((-60, 40.2934422872), (-58.9871703427, 44.6787323838), (-56.1538461538, 48.1757121072))
        make_face(mode=Mode.SUBTRACT)
        with Locations((60, 67.5)):
            Circle(F15_R_2, mode=Mode.SUBTRACT)
    extrude(amount=F16_DEPTH)


solid = Compound([f1.part, f16.part])
